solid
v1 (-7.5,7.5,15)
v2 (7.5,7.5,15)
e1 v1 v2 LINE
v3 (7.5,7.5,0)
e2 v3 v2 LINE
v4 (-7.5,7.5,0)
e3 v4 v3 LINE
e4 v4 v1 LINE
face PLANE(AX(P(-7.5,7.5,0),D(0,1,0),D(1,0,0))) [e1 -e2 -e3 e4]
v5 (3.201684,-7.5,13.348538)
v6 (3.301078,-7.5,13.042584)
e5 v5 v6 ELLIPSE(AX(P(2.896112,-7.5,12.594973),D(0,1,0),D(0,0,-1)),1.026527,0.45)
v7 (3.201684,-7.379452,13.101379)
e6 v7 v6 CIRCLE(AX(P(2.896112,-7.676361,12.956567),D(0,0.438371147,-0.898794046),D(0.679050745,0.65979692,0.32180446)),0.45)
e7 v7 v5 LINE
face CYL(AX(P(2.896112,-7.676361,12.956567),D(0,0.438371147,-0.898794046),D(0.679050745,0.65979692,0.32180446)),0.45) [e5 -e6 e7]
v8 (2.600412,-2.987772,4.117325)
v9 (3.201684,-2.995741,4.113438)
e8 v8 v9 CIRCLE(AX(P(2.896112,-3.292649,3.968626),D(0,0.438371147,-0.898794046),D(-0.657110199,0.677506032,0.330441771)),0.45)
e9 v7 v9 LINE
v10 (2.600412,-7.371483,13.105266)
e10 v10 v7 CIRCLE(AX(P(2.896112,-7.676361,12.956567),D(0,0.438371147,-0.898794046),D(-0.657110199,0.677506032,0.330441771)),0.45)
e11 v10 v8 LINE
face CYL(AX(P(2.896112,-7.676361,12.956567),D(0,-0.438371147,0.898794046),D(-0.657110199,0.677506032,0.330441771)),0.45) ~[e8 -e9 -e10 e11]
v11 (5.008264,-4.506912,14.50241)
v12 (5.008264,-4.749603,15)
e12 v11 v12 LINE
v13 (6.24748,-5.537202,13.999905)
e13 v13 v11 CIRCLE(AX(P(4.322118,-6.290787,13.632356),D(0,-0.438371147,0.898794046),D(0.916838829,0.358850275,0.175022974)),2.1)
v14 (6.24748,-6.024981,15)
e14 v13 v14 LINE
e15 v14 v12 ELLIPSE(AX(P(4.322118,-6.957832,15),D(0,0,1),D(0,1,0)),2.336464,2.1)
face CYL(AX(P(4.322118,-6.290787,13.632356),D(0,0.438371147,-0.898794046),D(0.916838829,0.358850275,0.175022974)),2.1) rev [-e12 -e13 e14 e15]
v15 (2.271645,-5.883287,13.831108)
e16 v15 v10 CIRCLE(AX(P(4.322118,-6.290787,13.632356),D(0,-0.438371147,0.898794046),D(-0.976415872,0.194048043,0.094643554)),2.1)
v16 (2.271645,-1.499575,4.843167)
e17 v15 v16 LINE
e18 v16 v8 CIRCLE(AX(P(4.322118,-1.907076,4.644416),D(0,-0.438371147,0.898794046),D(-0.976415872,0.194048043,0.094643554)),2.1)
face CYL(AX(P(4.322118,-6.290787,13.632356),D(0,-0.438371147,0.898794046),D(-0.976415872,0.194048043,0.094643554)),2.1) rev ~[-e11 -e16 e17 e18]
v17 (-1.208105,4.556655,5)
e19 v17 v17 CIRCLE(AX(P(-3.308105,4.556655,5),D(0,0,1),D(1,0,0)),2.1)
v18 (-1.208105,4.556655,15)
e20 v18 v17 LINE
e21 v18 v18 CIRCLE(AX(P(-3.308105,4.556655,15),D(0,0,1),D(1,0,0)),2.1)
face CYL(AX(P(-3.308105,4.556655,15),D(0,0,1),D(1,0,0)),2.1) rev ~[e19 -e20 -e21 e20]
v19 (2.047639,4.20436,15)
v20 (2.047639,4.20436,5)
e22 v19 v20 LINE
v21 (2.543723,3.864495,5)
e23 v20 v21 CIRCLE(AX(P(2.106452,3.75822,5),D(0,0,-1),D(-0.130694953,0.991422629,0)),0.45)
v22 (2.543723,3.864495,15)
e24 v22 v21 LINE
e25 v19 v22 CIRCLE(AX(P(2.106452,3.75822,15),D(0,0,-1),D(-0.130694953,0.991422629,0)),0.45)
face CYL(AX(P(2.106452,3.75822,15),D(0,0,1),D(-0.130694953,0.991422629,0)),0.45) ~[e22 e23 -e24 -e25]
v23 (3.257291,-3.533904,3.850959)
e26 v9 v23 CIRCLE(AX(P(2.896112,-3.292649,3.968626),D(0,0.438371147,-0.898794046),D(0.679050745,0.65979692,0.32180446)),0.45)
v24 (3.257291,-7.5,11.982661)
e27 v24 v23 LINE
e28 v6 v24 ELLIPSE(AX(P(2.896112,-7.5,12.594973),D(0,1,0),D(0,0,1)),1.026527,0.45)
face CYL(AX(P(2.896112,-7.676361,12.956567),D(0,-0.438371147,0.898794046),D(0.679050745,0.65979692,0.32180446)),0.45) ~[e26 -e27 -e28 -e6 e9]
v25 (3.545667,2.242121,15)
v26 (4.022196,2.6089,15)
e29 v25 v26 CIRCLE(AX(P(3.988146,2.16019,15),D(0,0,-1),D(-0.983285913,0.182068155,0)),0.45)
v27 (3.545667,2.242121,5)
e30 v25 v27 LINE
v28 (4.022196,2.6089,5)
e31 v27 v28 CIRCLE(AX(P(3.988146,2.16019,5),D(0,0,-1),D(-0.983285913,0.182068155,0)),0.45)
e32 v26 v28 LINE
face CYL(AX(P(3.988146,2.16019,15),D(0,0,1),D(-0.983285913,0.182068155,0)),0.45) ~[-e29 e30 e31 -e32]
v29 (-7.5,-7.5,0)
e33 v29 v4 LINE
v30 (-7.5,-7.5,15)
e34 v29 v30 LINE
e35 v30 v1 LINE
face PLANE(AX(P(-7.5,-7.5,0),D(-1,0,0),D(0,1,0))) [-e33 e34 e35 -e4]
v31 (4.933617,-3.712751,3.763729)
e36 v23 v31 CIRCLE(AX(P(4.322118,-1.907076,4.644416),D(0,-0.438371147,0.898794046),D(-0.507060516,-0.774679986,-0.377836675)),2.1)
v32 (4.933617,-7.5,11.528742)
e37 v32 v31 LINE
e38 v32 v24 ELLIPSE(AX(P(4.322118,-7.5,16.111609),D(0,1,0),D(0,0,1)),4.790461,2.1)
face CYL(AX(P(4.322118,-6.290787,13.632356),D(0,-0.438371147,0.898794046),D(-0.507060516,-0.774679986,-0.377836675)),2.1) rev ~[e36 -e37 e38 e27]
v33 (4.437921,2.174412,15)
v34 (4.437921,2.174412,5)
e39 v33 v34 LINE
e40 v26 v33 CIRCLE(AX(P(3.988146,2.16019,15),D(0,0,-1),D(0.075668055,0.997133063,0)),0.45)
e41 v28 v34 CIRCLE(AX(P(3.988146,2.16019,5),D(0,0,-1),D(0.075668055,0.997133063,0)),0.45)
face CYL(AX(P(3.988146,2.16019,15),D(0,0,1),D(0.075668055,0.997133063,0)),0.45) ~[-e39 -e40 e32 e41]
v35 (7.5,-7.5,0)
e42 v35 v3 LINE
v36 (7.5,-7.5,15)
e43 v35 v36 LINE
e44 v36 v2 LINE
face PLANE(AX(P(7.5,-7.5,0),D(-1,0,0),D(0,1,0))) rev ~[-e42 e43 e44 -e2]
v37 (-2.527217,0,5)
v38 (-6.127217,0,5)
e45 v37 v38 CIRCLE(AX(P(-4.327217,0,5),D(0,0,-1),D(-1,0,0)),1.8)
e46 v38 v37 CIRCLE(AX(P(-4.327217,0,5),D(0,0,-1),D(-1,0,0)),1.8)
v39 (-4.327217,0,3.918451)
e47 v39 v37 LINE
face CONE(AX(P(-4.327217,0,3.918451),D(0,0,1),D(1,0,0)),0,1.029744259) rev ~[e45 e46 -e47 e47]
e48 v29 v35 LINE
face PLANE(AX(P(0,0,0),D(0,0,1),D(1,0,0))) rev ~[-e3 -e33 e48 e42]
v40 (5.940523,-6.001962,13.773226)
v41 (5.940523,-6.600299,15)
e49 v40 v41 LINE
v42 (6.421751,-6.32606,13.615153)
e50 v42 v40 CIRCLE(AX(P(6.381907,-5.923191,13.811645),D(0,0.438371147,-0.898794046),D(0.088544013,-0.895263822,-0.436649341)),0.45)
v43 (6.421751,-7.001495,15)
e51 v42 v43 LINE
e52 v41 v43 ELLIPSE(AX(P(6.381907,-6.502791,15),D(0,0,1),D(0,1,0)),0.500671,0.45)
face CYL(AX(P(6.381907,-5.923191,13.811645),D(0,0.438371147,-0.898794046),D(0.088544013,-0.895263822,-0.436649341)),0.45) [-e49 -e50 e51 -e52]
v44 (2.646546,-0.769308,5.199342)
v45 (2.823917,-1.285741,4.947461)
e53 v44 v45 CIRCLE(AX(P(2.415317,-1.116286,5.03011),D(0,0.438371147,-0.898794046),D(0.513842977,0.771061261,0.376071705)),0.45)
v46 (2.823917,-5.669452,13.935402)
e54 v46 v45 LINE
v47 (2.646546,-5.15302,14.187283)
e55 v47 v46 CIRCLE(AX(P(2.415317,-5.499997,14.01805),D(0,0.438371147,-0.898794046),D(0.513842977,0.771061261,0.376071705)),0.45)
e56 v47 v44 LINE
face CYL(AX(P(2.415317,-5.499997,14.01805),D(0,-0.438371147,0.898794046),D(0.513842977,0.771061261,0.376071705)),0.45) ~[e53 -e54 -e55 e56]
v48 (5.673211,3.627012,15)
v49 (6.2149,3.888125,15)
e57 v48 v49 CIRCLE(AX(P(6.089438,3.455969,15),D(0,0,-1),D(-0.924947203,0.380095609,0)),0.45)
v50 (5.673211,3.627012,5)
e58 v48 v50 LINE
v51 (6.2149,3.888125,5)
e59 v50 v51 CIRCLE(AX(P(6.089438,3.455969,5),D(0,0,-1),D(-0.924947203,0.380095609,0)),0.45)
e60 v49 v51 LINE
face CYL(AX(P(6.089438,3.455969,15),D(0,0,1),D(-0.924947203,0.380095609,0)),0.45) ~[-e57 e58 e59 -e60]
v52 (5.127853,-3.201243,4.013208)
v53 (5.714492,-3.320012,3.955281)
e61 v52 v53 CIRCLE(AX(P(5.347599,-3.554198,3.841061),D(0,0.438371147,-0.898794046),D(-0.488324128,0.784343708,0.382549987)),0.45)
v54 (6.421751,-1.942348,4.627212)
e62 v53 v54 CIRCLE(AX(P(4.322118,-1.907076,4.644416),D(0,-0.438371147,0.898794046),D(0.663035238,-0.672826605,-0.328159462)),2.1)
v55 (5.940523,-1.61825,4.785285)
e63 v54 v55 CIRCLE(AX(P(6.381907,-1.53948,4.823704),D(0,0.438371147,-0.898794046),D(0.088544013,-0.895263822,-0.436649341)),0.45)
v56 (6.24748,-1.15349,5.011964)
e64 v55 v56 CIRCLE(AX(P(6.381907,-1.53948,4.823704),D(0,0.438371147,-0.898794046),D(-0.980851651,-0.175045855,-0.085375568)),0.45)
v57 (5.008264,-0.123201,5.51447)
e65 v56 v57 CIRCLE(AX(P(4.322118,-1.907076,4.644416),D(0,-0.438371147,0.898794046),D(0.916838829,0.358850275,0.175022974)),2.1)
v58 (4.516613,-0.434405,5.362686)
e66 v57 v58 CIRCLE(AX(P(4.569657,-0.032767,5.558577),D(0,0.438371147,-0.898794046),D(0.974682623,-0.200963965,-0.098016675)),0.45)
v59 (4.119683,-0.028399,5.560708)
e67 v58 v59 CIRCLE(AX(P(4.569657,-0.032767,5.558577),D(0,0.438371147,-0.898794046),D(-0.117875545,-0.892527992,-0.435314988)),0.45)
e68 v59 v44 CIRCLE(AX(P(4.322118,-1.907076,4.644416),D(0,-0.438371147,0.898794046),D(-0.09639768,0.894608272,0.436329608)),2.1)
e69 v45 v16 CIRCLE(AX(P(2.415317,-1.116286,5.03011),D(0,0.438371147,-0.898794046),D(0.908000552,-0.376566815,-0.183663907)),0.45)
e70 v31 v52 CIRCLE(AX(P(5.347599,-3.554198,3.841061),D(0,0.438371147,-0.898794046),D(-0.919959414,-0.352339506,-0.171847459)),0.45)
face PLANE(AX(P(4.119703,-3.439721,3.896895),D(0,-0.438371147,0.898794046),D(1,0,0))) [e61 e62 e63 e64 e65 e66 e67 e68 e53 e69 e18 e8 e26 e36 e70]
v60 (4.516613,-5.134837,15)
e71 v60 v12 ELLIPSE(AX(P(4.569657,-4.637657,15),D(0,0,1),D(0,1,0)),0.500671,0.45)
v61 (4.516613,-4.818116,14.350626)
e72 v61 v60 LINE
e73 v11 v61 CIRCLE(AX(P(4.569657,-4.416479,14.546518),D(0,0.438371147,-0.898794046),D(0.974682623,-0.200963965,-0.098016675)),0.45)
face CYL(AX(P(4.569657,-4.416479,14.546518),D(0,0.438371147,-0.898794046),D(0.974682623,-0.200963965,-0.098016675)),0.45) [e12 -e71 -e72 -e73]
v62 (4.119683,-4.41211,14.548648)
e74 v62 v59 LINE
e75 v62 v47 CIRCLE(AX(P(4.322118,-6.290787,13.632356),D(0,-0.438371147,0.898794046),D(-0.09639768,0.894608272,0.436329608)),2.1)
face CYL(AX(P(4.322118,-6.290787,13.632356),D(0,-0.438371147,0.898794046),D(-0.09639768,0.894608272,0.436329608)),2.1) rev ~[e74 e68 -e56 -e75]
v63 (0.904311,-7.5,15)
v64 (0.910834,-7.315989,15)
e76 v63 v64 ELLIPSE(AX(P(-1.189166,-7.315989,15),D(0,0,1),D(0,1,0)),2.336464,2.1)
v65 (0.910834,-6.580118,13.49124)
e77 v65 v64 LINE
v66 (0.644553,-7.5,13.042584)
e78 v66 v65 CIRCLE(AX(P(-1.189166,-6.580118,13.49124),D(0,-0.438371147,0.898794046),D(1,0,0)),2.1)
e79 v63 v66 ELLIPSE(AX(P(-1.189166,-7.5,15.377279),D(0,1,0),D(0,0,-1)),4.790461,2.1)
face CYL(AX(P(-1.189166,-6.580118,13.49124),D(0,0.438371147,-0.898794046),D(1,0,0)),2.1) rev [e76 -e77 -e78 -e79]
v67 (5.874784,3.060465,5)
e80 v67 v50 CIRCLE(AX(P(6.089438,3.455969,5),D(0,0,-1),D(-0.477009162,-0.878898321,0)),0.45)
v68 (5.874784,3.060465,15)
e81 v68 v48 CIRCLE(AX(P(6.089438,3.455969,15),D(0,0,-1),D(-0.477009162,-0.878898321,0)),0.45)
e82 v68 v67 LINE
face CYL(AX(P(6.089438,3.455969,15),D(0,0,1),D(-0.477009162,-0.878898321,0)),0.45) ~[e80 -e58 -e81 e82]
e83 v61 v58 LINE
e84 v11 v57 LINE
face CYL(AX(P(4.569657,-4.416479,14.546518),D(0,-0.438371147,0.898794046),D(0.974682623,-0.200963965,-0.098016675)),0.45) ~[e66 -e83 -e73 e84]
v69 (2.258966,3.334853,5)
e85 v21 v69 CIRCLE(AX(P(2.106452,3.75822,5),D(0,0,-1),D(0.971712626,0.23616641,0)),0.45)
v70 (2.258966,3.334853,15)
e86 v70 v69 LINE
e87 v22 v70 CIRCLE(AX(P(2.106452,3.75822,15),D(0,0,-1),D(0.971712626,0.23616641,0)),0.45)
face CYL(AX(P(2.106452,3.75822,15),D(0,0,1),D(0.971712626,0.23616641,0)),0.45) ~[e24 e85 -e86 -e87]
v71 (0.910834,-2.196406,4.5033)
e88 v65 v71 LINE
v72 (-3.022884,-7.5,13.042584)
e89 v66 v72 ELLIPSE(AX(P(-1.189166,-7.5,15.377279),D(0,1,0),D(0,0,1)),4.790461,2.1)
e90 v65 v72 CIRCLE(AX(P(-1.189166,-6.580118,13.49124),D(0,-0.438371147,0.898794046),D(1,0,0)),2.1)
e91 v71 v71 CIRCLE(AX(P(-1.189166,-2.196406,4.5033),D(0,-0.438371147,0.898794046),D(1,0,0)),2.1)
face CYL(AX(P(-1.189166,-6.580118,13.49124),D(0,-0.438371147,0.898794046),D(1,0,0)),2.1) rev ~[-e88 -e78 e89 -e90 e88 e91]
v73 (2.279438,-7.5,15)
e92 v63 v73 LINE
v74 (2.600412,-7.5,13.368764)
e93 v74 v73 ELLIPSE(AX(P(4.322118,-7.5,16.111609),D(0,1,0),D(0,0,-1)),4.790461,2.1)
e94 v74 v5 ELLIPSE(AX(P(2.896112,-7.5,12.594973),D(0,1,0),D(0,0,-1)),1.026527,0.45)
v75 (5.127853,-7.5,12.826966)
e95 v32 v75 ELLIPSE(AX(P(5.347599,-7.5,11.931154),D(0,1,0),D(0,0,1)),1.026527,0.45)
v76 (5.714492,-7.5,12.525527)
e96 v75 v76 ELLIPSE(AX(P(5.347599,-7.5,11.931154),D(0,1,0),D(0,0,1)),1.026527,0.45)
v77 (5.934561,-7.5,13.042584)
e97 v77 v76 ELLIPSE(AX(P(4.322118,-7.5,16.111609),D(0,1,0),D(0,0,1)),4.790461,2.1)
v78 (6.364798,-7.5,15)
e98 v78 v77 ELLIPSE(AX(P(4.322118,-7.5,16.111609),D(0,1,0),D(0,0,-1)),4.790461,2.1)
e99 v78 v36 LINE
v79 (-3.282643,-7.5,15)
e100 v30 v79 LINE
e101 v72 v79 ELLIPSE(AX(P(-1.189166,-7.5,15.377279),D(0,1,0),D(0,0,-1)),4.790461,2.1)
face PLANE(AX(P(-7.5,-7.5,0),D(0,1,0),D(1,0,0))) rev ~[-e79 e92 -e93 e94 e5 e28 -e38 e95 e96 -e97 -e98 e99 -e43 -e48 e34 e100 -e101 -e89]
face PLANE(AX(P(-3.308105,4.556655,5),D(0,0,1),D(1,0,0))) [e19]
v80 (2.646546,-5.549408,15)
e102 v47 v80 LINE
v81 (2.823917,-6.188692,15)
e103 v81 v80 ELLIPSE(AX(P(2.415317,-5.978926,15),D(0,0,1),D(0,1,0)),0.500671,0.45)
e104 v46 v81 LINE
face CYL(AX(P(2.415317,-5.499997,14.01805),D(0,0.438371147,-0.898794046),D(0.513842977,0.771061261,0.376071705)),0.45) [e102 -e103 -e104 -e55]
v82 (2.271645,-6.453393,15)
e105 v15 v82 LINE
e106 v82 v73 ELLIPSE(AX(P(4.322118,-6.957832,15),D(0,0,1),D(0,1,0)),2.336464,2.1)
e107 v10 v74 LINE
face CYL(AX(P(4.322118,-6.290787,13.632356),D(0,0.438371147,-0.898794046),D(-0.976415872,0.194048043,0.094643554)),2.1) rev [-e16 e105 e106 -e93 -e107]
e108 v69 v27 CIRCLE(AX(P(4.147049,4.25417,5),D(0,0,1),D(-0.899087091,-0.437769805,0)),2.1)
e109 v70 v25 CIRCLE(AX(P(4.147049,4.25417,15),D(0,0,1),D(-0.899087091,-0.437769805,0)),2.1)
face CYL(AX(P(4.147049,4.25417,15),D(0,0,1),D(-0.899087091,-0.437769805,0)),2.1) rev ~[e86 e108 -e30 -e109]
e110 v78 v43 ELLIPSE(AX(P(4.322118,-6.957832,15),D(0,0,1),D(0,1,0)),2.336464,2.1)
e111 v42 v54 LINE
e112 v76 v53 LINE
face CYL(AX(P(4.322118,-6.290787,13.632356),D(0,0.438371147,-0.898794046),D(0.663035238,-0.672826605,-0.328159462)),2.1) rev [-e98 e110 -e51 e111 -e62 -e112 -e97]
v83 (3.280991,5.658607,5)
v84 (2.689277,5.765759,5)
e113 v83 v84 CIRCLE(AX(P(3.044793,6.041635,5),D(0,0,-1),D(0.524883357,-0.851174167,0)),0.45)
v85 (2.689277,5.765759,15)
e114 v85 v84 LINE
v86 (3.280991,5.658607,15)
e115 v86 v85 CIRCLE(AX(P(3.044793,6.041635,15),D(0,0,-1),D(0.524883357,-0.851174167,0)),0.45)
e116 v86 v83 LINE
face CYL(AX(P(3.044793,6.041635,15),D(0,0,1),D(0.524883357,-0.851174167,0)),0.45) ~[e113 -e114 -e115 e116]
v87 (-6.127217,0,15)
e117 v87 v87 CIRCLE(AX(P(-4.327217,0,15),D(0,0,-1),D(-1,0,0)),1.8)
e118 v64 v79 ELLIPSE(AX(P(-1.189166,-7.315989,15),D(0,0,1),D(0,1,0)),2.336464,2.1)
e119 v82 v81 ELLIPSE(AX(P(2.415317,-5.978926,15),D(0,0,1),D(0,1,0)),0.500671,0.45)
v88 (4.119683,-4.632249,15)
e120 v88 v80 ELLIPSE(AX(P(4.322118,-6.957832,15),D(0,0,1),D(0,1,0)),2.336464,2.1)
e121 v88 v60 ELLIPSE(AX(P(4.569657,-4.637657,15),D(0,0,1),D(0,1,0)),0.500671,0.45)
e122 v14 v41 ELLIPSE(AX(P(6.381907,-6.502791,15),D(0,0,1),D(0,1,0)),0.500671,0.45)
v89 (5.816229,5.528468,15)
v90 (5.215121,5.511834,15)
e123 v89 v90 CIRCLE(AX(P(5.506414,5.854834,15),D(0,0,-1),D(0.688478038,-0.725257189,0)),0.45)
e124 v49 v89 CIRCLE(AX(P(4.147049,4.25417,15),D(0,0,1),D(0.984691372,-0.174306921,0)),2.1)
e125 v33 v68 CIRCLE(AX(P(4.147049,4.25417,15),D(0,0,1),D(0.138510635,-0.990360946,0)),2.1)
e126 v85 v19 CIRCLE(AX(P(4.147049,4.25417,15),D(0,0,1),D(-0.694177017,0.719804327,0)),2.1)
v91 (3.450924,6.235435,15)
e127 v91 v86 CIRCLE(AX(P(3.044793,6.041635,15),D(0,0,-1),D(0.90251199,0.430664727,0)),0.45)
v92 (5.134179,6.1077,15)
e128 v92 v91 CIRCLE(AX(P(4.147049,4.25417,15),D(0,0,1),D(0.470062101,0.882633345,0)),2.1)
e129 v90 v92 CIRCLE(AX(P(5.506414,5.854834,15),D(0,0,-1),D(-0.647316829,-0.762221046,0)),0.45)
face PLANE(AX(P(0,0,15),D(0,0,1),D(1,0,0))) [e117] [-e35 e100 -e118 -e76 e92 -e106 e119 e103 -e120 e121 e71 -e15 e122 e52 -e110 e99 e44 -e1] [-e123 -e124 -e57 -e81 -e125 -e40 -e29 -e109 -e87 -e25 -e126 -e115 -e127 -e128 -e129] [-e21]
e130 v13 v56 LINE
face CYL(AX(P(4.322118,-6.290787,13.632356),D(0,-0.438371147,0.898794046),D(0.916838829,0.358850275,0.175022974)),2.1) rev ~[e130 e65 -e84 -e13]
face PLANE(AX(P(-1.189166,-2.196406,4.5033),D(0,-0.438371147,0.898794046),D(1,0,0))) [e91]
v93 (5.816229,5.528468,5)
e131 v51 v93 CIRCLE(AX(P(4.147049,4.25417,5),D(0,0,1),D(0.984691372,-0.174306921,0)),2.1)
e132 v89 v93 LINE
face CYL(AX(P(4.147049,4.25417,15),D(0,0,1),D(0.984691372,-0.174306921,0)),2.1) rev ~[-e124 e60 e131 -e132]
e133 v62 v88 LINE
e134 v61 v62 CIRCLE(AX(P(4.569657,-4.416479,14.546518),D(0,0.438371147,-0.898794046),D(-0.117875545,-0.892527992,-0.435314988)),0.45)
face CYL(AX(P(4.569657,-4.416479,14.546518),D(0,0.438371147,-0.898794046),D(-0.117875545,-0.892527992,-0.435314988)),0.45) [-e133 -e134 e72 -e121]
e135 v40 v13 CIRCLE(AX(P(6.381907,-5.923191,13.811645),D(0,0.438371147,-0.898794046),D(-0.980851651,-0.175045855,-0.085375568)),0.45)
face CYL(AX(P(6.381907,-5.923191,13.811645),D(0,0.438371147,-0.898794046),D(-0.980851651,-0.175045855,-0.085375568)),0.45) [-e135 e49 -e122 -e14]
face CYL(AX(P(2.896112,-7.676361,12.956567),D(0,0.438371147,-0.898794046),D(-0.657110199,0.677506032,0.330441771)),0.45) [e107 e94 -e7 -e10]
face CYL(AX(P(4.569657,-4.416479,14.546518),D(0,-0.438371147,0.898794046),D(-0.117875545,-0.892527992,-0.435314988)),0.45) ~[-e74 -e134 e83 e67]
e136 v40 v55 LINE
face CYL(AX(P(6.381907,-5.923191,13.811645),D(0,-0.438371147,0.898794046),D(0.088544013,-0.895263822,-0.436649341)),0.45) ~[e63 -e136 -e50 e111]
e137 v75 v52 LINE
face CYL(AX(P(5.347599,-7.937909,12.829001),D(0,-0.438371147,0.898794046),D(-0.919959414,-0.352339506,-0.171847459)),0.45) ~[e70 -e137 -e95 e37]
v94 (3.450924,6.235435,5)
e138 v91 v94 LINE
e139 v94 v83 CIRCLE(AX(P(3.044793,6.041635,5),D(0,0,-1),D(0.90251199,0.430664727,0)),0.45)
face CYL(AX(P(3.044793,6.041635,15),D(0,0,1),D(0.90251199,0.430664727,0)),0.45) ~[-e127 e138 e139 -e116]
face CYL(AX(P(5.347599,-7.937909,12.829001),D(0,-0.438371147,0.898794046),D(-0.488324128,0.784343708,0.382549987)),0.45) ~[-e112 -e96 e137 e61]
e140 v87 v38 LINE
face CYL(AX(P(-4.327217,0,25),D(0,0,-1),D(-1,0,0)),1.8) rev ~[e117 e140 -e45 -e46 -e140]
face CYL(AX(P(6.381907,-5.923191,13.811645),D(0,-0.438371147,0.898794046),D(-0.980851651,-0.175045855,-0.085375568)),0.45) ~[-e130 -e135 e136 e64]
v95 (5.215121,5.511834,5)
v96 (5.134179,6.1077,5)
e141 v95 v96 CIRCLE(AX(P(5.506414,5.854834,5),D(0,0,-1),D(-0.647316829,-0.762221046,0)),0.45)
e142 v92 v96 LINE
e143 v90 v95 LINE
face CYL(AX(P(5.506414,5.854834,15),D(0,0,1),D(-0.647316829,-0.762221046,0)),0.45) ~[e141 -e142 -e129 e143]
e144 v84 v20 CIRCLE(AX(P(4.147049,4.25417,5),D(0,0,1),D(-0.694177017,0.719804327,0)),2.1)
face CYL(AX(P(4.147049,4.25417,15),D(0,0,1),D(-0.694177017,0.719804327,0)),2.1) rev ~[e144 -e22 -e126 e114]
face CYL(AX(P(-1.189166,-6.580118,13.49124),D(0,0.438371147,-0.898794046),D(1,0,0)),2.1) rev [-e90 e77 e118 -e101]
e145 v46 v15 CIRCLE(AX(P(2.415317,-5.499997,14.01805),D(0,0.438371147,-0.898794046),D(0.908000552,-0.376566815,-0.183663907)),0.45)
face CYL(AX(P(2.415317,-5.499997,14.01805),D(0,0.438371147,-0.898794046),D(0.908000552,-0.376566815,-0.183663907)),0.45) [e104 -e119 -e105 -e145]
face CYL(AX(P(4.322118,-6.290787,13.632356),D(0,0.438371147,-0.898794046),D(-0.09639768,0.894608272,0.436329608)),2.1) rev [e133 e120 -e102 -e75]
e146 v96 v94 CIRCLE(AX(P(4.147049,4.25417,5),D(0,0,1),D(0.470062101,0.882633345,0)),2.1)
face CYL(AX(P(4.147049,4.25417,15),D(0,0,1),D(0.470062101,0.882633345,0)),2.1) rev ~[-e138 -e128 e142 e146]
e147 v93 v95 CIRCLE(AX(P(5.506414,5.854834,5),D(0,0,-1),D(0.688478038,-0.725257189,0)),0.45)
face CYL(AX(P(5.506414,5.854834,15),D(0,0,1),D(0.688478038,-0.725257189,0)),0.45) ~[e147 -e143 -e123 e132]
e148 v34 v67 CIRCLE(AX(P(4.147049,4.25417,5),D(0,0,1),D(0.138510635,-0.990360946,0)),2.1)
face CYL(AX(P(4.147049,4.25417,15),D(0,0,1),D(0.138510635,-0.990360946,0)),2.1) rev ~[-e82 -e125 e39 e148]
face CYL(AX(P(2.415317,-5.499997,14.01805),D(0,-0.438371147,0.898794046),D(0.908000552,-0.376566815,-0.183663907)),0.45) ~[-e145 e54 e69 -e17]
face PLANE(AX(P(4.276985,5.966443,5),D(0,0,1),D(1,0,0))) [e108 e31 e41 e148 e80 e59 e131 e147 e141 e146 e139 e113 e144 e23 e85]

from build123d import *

# Parameters (mm, degrees)
F0_W           = 15
F0_H           = 15
F1_DEPTH       = 15
F2_R           = 2.1
F3_DEPTH       = 10
F4_DEPTH       = 10
F6_D           = 3.6
F6_DEPTH       = 10
F6_TIP         = 1.0815491142
F9_R           = 2.1
F10_DEPTH      = 10
F10_DEPTH_BACK = 10
F11_DEPTH      = 10
F11_DEPTH_BACK = 10


with BuildPart() as f1:
    # F0 (on Top) → F1 (new body)
    with BuildSketch(Plane.XY):
        Rectangle(F0_W, F0_H)
    extrude(amount=F1_DEPTH)

    # F2 (on face) → F3 (cut)
    with BuildSketch(Plane.XY.offset(15)):
        with Locations((-3.3081052825, 4.5566549525)):
            Circle(F2_R)
    extrude(amount=-F3_DEPTH, mode=Mode.SUBTRACT)

    # F2 (on face) → F4 (cut)
    with BuildSketch(Plane.XY.offset(15)):
        with BuildLine():
            ThreePointArc((3.2809909909, 5.6586071096), (4.271900841, 5.899439318), (5.2151213678, 5.5118344659))
            ThreePointArc((5.2151213678, 5.5118344659), (5.0605091693, 5.7942622045), (5.1341789855, 6.1076997863))
            ThreePointArc((5.1341789855, 6.1076997863), (4.3059514618, 6.3481491967), (3.450923876, 6.2354346119))
            ThreePointArc((3.450923876, 6.2354346119), (3.4764516514, 5.9144693594), (3.2809909909, 5.6586071096))
        make_face()
        with BuildLine():
            ThreePointArc((3.5456670252, 2.2421209971), (3.7136732609, 2.5167921893), (4.0221963108, 2.608900206))
            ThreePointArc((4.0221963108, 2.608900206), (3.0789758, 2.9965050415), (2.5437227765, 3.8644950423))
            ThreePointArc((2.5437227765, 3.8644950423), (2.5027997945, 3.5451274527), (2.2589656824, 3.334853171))
            ThreePointArc((2.2589656824, 3.334853171), (2.787683207, 2.6535055877), (3.5456670252, 2.2421209971))
        make_face()
        with BuildLine():
            ThreePointArc((5.8747835443, 3.0604646595), (5.6654725032, 3.3051261397), (5.6732114262, 3.6270119283))
            ThreePointArc((5.6732114262, 3.6270119283), (5.0131061422, 2.8497324056), (4.0221963108, 2.608900206))
            ThreePointArc((4.0221963108, 2.608900206), (4.313287058, 2.471290132), (4.4379209082, 2.174411775))
            ThreePointArc((4.4379209082, 2.174411775), (5.2493036675, 2.4667040397), (5.8747835443, 3.0604646595))
        make_face()
        with BuildLine():
            ThreePointArc((5.2151213678, 5.5118344659), (5.644516455, 4.9470549944), (5.7970485739, 4.2541697621))
            ThreePointArc((5.7970485739, 4.2541697621), (5.7657932583, 3.9345361486), (5.6732114262, 3.6270119283))
            ThreePointArc((5.6732114262, 3.6270119283), (5.8940383698, 3.8613318458), (6.2149004544, 3.8881252289))
            ThreePointArc((6.2149004544, 3.8881252289), (6.1876450529, 4.7501193664), (5.816229058, 5.5284682012))
            ThreePointArc((5.816229058, 5.5284682012), (5.5188614887, 5.4050061266), (5.2151213678, 5.5118344659))
        make_face()
        with BuildLine():
            ThreePointArc((2.5437227765, 3.8644950423), (2.6208857067, 4.8813275594), (3.2809909909, 5.6586071096))
            ThreePointArc((3.2809909909, 5.6586071096), (2.9646084595, 5.598837153), (2.6892768391, 5.7657588495))
            ThreePointArc((2.6892768391, 5.7657588495), (2.2046594805, 5.0523706202), (2.0476393662, 4.204360341))
            ThreePointArc((2.0476393662, 4.204360341), (2.360783986, 4.1294549747), (2.5437227765, 3.8644950423))
        make_face()
        with BuildLine():
            ThreePointArc((5.6732114262, 3.6270119283), (5.7657932583, 3.9345361486), (5.7970485739, 4.2541697621))
            ThreePointArc((5.7970485739, 4.2541697621), (5.644516455, 4.9470549944), (5.2151213678, 5.5118344659))
            ThreePointArc((5.2151213678, 5.5118344659), (4.271900841, 5.899439318), (3.2809909909, 5.6586071096))
            ThreePointArc((3.2809909909, 5.6586071096), (2.6208857067, 4.8813275594), (2.5437227765, 3.8644950423))
            ThreePointArc((2.5437227765, 3.8644950423), (3.0789758, 2.9965050415), (4.0221963108, 2.608900206))
            ThreePointArc((4.0221963108, 2.608900206), (5.0131061422, 2.8497324056), (5.6732114262, 3.6270119283))
        make_face()
    extrude(amount=-F4_DEPTH, mode=Mode.SUBTRACT)

    # F6
    with Locations(Plane.XY.offset(15)):
        with Locations((-4.327217117, 0)):
            Hole(F6_D / 2, depth=F6_DEPTH)
            with Locations((0, 0, -(F6_DEPTH + F6_TIP / 2))):  # 118° drill point
                Cone(0, F6_D / 2, F6_TIP, mode=Mode.SUBTRACT)

    # F9 (on line) → F10 (cut, two sides)
    with BuildSketch(Plane(origin=(0, -6.5801176454, 13.4912404864), x_dir=(1, 0, 0), z_dir=(0, -0.4383711468, 0.8987940463))) as f10_sk:
        with Locations((-1.1891657487, 0)):
            Circle(F9_R)
    extrude(amount=-F10_DEPTH, mode=Mode.SUBTRACT)
    extrude(f10_sk.sketch, amount=F10_DEPTH_BACK, mode=Mode.SUBTRACT)

    # F9 (on line) → F11 (cut, two sides)
    with BuildSketch(Plane(origin=(0, -6.5801176454, 13.4912404864), x_dir=(1, 0, 0), z_dir=(0, -0.4383711468, 0.8987940463))) as f11_sk:
        with BuildLine():
            ThreePointArc((4.9336170518, -1.6870876514), (4.9217202173, -1.3653287012), (5.1278529304, -1.117983474))
            ThreePointArc((5.1278529304, -1.117983474), (4.1276234932, -1.3165874448), (3.2016843949, -0.8893413207))
            ThreePointArc((3.2016843949, -0.8893413207), (3.3441834561, -1.178070216), (3.2572910424, -1.4881025786))
            ThreePointArc((3.2572910424, -1.4881025786), (4.0745795038, -1.7634502148), (4.9336170518, -1.6870876514))
        make_face()
        with BuildLine():
            ThreePointArc((2.6004119701, -0.8804748841), (2.9027465931, -0.7697313384), (3.2016843949, -0.8893413207))
            ThreePointArc((3.2016843949, -0.8893413207), (2.7037129005, 0.0005613942), (2.823917186, 1.0132081149))
            ThreePointArc((2.823917186, 1.0132081149), (2.5933543197, 0.7884613294), (2.2716447953, 0.7752956598))
            ThreePointArc((2.2716447953, 0.7752956598), (2.2623296555, -0.0870789562), (2.6004119701, -0.8804748841))
        make_face()
        with BuildLine():
            ThreePointArc((5.1278529304, -1.117983474), (5.7454877945, -0.5126676326), (5.9721181259, 0.3219093778))
            ThreePointArc((5.9721181259, 0.3219093778), (5.9642004358, 0.483358092), (5.9405233533, 0.6432573507))
            ThreePointArc((5.9405233533, 0.6432573507), (5.4425518562, 1.5331600768), (4.5166127528, 1.9604062012))
            ThreePointArc((4.5166127528, 1.9604062012), (3.5163833114, 1.7618022241), (2.823917186, 1.0132081149))
            ThreePointArc((2.823917186, 1.0132081149), (2.7037129005, 0.0005613942), (3.2016843949, -0.8893413207))
            ThreePointArc((3.2016843949, -0.8893413207), (4.1276234932, -1.3165874448), (5.1278529304, -1.117983474))
        make_face()
        with BuildLine():
            ThreePointArc((5.9405233533, 0.6432573507), (5.9642004358, 0.483358092), (5.9721181259, 0.3219093778))
            ThreePointArc((5.9721181259, 0.3219093778), (5.7454877945, -0.5126676326), (5.1278529304, -1.117983474))
            ThreePointArc((5.1278529304, -1.117983474), (5.4464850598, -1.0716809479), (5.7144921267, -1.2501258132))
            ThreePointArc((5.7144921267, -1.2501258132), (6.2289193143, -0.5579253952), (6.4217514019, 0.2826651924))
            ThreePointArc((6.4217514019, 0.2826651924), (6.1120641324, 0.3707796135), (5.9405233533, 0.6432573507))
        make_face()
        with BuildLine():
            ThreePointArc((4.5166127528, 1.9604062012), (5.4425518562, 1.5331600768), (5.9405233533, 0.6432573507))
            ThreePointArc((5.9405233533, 0.6432573507), (5.9949497762, 0.9606027823), (6.2474796669, 1.1603501546))
            ThreePointArc((6.2474796669, 1.1603501546), (5.7481246921, 1.8635011762), (5.0082639284, 2.3066521666))
            ThreePointArc((5.0082639284, 2.3066521666), (4.8287635013, 2.039350922), (4.5166127528, 1.9604062012))
        make_face()
        with BuildLine():
            ThreePointArc((2.823917186, 1.0132081149), (3.5163833114, 1.7618022241), (4.5166127528, 1.9604062012))
            ThreePointArc((4.5166127528, 1.9604062012), (4.2316180075, 2.1102339389), (4.119682998, 2.4121294665))
            ThreePointArc((4.119682998, 2.4121294665), (3.2966374636, 2.1545002791), (2.646546277, 1.5877920657))
            ThreePointArc((2.646546277, 1.5877920657), (2.8452961865, 1.3344763829), (2.823917186, 1.0132081149))
        make_face()
    extrude(amount=-F11_DEPTH, mode=Mode.SUBTRACT)
    extrude(f11_sk.sketch, amount=F11_DEPTH_BACK, mode=Mode.SUBTRACT)


solid = f1.part
